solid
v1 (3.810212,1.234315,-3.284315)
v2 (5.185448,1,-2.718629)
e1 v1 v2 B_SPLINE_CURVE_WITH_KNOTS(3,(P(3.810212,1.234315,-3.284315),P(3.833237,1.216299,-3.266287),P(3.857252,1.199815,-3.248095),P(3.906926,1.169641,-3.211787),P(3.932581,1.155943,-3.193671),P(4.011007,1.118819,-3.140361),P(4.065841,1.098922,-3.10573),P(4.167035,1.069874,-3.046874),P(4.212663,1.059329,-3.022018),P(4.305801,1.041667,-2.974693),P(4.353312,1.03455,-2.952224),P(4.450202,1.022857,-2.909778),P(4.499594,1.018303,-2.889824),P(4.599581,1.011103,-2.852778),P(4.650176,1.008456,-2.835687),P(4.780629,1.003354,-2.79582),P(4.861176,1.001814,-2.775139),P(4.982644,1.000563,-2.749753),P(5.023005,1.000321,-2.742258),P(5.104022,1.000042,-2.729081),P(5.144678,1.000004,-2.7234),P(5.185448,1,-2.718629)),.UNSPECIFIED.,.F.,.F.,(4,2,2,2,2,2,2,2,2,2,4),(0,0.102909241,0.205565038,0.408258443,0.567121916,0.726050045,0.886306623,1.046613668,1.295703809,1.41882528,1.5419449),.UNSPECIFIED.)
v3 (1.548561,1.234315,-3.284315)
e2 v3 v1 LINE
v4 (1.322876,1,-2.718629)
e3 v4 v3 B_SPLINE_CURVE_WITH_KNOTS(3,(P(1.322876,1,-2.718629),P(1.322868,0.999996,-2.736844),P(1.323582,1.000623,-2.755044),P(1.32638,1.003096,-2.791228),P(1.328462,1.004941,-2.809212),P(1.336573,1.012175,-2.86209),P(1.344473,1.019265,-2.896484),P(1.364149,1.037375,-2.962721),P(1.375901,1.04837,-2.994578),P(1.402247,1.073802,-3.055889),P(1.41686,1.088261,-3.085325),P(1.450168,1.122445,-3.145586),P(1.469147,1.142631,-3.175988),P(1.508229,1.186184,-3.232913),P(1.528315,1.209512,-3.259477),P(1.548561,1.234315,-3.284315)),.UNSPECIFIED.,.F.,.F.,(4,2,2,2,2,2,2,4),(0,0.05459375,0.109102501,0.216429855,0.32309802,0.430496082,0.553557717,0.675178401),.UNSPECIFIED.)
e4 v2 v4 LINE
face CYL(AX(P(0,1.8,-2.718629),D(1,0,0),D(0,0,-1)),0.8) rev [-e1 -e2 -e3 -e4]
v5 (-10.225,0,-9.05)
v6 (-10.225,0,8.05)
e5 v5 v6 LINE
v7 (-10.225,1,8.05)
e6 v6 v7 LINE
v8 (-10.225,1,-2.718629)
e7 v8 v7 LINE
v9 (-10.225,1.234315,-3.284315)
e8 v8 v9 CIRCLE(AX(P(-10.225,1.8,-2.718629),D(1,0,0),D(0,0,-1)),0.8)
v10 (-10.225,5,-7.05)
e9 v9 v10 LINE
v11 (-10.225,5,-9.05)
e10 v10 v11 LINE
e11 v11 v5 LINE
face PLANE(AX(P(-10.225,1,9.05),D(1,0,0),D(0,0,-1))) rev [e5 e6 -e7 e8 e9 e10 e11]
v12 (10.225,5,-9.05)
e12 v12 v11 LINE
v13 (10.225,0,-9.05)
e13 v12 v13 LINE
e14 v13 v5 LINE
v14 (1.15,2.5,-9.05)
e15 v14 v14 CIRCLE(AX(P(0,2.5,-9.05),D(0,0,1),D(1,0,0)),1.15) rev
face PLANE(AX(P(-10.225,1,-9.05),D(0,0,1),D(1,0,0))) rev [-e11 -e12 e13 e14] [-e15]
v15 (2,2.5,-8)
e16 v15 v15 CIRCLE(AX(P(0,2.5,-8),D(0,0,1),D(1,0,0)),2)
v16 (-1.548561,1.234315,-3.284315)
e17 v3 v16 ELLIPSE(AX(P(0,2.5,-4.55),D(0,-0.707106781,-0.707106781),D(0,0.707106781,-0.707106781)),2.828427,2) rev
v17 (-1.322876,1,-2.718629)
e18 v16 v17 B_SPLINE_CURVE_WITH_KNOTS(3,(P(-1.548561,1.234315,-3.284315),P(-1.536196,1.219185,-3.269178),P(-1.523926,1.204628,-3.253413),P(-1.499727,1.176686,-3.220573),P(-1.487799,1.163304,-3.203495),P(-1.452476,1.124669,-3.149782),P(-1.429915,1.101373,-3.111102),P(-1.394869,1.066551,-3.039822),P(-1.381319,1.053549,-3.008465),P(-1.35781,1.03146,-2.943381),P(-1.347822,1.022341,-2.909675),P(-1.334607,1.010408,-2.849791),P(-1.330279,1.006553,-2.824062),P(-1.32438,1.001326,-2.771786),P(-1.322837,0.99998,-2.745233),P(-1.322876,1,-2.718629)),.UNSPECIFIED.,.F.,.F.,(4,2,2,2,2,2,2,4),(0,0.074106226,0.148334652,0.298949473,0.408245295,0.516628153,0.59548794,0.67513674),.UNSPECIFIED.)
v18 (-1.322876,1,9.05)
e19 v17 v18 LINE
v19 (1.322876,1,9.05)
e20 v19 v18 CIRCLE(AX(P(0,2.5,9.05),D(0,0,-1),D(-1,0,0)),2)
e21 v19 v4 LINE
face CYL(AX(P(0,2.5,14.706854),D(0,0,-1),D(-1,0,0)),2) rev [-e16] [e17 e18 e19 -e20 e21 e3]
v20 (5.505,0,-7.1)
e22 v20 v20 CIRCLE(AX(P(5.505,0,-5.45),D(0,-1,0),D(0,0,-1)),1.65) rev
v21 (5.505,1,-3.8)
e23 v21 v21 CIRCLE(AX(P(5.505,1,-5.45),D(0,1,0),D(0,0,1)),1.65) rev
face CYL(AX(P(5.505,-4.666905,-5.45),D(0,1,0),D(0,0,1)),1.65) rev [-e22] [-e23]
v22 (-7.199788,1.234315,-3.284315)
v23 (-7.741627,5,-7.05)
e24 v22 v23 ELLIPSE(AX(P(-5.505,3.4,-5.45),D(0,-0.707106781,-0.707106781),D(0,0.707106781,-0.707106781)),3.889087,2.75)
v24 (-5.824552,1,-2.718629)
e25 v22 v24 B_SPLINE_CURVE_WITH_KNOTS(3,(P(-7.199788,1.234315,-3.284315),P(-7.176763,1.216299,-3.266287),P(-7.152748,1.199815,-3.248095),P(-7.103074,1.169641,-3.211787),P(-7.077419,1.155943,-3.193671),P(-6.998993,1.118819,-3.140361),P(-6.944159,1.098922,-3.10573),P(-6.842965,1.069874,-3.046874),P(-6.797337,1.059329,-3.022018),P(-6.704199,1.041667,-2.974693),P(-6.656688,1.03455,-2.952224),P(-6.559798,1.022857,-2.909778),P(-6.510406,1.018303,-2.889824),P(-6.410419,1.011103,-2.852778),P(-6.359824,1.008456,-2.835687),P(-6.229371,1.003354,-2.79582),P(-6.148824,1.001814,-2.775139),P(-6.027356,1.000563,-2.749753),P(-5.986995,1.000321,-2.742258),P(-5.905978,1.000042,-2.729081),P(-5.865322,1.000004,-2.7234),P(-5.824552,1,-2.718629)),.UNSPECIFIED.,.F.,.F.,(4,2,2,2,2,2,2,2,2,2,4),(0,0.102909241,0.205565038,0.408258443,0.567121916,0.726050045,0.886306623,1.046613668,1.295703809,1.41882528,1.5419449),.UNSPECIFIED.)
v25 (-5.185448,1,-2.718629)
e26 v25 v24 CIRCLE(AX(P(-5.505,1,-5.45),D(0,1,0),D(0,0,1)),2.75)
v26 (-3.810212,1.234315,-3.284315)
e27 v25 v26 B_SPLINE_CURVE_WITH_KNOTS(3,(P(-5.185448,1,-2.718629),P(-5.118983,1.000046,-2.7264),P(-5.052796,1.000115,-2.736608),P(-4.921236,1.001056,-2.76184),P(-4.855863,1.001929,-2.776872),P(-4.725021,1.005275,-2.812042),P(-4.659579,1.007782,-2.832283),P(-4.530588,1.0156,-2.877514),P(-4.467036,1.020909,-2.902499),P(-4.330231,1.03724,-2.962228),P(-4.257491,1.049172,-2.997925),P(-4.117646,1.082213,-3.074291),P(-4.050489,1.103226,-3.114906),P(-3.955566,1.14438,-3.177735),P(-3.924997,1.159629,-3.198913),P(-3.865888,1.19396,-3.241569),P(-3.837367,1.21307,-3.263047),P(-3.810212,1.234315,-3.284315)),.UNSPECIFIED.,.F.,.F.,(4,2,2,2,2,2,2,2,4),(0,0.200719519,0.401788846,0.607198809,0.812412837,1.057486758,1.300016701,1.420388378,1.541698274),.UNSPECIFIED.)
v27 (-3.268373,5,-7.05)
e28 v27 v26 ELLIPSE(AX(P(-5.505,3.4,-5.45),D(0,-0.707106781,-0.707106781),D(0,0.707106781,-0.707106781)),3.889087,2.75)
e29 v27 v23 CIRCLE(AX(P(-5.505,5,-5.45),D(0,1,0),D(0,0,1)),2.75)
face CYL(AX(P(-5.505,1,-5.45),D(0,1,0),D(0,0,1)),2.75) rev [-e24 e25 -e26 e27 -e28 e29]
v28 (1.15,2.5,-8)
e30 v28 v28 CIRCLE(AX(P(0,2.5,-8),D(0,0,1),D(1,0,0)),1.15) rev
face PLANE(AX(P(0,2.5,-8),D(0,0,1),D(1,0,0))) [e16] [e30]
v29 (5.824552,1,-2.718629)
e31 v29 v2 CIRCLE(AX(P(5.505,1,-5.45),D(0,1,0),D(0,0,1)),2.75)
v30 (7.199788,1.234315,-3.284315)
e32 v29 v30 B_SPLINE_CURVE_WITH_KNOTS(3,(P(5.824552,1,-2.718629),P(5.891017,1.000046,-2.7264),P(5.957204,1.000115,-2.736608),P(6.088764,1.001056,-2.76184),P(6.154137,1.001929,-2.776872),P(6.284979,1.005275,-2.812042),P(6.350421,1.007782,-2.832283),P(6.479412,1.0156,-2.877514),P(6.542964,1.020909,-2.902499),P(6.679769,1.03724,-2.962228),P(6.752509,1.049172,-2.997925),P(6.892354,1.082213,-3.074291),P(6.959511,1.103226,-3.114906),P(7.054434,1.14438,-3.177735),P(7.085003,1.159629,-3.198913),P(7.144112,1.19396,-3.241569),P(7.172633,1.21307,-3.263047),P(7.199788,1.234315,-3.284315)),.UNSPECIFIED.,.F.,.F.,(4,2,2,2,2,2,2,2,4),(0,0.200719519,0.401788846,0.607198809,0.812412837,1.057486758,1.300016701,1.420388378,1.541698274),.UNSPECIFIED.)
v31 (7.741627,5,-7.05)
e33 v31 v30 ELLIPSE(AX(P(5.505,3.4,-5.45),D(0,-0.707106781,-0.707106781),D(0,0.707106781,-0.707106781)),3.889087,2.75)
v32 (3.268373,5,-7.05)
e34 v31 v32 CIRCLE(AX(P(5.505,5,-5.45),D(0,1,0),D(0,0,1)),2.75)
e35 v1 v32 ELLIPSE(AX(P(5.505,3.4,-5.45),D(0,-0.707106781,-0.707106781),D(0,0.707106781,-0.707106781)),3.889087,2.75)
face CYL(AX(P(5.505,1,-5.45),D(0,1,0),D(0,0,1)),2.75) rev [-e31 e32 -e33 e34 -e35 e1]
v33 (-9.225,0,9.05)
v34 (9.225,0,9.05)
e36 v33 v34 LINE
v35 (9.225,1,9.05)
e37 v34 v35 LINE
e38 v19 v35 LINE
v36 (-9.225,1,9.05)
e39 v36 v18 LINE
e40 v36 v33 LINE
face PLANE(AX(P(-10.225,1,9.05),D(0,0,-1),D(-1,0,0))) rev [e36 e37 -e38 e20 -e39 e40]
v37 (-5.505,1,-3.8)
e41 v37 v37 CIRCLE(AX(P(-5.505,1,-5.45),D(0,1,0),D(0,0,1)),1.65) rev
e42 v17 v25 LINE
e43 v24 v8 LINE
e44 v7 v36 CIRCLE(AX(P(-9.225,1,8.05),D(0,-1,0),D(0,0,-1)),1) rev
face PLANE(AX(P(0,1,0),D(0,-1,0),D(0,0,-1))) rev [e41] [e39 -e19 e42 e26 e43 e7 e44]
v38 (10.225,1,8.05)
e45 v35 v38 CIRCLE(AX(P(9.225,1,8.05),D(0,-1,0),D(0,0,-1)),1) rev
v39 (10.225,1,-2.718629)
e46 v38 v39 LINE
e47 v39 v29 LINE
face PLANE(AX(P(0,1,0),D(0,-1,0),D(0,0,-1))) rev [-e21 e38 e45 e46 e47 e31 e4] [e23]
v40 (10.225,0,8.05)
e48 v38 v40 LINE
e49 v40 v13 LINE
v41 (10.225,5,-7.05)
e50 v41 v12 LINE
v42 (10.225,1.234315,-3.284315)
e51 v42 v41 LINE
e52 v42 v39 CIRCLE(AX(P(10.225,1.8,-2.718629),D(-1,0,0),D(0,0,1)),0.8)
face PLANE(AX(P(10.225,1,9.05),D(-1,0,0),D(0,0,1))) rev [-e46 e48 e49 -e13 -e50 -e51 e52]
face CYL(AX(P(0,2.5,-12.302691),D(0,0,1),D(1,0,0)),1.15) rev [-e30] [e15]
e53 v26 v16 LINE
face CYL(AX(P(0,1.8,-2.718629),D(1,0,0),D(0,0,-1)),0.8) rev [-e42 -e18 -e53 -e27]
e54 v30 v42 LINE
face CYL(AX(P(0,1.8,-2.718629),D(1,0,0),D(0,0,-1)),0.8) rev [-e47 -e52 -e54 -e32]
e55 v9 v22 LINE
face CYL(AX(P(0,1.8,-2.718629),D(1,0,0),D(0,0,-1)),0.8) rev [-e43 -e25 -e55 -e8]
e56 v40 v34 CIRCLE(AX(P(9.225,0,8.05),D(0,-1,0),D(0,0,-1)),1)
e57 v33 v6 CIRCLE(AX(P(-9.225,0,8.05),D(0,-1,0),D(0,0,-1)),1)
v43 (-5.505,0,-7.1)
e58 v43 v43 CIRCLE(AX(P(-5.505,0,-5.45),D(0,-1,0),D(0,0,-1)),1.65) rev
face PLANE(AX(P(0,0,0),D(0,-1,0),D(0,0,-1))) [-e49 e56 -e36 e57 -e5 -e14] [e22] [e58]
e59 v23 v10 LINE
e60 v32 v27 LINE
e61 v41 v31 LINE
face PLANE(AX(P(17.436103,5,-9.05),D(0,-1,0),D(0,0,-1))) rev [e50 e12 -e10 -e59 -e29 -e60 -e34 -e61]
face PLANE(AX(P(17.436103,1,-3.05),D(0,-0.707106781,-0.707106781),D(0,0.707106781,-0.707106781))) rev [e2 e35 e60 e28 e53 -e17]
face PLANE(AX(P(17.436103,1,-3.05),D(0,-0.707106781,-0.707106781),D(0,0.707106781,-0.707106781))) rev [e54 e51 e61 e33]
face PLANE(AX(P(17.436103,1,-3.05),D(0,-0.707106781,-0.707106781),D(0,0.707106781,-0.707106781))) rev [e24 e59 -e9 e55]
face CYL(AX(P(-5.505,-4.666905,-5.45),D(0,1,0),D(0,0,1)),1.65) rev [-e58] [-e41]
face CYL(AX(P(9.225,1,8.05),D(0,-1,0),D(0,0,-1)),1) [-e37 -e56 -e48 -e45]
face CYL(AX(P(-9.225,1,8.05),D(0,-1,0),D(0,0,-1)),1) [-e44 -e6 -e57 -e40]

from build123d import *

# Parameters (mm, degrees)
SKETCH1_W                       = 20.45
SKETCH1_H                       = 18.1
BOSS_EXTRUDE2_DEPTH             = 1
BOSS_EXTRUDE3_REACH             = 15.691
BOSS_EXTRUDE3_DIRECTION_2_REACH = 15.691
SKETCH4_R                       = 1.65
CUT_EXTRUDE1_DEPTH              = 5
SKETCH6_R                       = 2.75
CUT_EXTRUDE2_DEPTH              = 4
SKETCH7_R                       = 1.15
CUT_EXTRUDE3_DEPTH              = 9.05
SKETCH8_R                       = 2
CUT_EXTRUDE4_DEPTH              = 8
CUT_EXTRUDE4_DIRECTION_2_REACH  = 16.541
FILLET2_R                       = 1
FILLET3_R                       = 0.8


with BuildPart() as part:
    # Sketch1 → Boss-Extrude2 (new body)
    with BuildSketch(Plane(origin=(0, 0, 0), x_dir=(1, 0, 0), z_dir=(0, 1, 0))):
        Rectangle(SKETCH1_W, SKETCH1_H)
    extrude(amount=BOSS_EXTRUDE2_DEPTH)

    # Boss-Extrude3: up to this face of the body (flat: up to its plane)
    boss_extrude3_end = Plane(part.part.faces().sort_by_distance((10.225, 0.5, 0))[0])
    # Sketch3 → Boss-Extrude3 (add, up to the picked face)
    with BuildSketch(Plane(origin=(0, 0, 0), x_dir=(0, 0, -1), z_dir=(1, 0, 0)), mode=Mode.PRIVATE) as boss_extrude3_sk1:
        Polygon((9.05, 1), (9.05, 5), (7.05, 5), (3.05, 1), align=None)
    boss_extrude3_tool1 = split(extrude(boss_extrude3_sk1.sketch, amount=BOSS_EXTRUDE3_REACH, mode=Mode.PRIVATE), bisect_by=boss_extrude3_end, keep=Keep.BOTH, mode=Mode.PRIVATE)
    add(boss_extrude3_tool1.solids().sort_by(Axis((0, 2.666667, -6.883333), (1, 0, 0)))[0])

    # Boss-Extrude3 direction 2: up to this face of the body (flat: up to its plane)
    boss_extrude3_direction_2_end = Plane(part.part.faces().sort_by_distance((-10.225, 0.5, 0))[0])
    # Sketch3 → Boss-Extrude3 direction 2 (add, up to the picked face)
    with BuildSketch(Plane(origin=(0, 0, 0), x_dir=(0, 0, -1), z_dir=(1, 0, 0)), mode=Mode.PRIVATE) as boss_extrude3_direction_2_sk1:
        Polygon((9.05, 1), (9.05, 5), (7.05, 5), (3.05, 1), align=None)
    boss_extrude3_direction_2_tool1 = split(extrude(boss_extrude3_direction_2_sk1.sketch, amount=-BOSS_EXTRUDE3_DIRECTION_2_REACH, mode=Mode.PRIVATE), bisect_by=boss_extrude3_direction_2_end, keep=Keep.BOTH, mode=Mode.PRIVATE)
    add(boss_extrude3_direction_2_tool1.solids().sort_by(Axis((0, 2.666667, -6.883333), (-1, 0, 0)))[0])

    # Sketch4 → Cut-Extrude1 (cut)
    with BuildSketch(Plane(origin=(0, 5, 0), x_dir=(1, 0, 0), z_dir=(0, 1, 0))):
        with Locations(Location((-5.505, 5.45, 0), (0, 0, 104.141110234))):
            Circle(SKETCH4_R)
        with Locations(Location((5.505, 5.45, 0), (0, 0, 75.858889766))):
            Circle(SKETCH4_R)
    extrude(amount=-CUT_EXTRUDE1_DEPTH, mode=Mode.SUBTRACT)

    # Sketch6 → Cut-Extrude2 (cut)
    with BuildSketch(Plane(origin=(0, 5, 0), x_dir=(1, 0, 0), z_dir=(0, 1, 0))):
        with Locations((-5.505, 5.45)):
            Circle(SKETCH6_R)
        with Locations((5.505, 5.45)):
            Circle(SKETCH6_R)
    extrude(amount=-CUT_EXTRUDE2_DEPTH, mode=Mode.SUBTRACT)

    # Sketch7 → Cut-Extrude3 (cut)
    with BuildSketch(Plane.XY):
        with Locations((0, 2.5)):
            Circle(SKETCH7_R)
    extrude(amount=-CUT_EXTRUDE3_DEPTH, mode=Mode.SUBTRACT)

    # Sketch8 → Cut-Extrude4 (cut)
    with BuildSketch(Plane.XY):
        with Locations(Location((0, 2.5, 0), (0, 0, 228.590377891))):
            Circle(SKETCH8_R)
    extrude(amount=-CUT_EXTRUDE4_DEPTH, mode=Mode.SUBTRACT)

    # Cut-Extrude4 direction 2: up to this face of the body (flat: up to its plane)
    cut_extrude4_direction_2_end = Plane(part.part.faces().sort_by_distance((0, 0.5, 9.05))[0])
    # Sketch8 → Cut-Extrude4 direction 2 (cut, up to the picked face)
    with BuildSketch(Plane.XY, mode=Mode.PRIVATE) as cut_extrude4_direction_2_sk1:
        with Locations(Location((0, 2.5, 0), (0, 0, 228.590377891))):
            Circle(SKETCH8_R)
    cut_extrude4_direction_2_tool1 = split(extrude(cut_extrude4_direction_2_sk1.sketch, amount=CUT_EXTRUDE4_DIRECTION_2_REACH, mode=Mode.PRIVATE), bisect_by=cut_extrude4_direction_2_end, keep=Keep.BOTH, mode=Mode.PRIVATE)
    add(cut_extrude4_direction_2_tool1.solids().sort_by(Axis((0, 2.5, 0), (0, 0, 1)))[0], mode=Mode.SUBTRACT)

    # Fillet2
    fillet2_edges = [part.edges().sort_by_distance(p)[0] for p in [
        (10.225, 0.5, 9.05),
        (-10.225, 0.5, 9.05),
    ]]
    fillet(fillet2_edges, radius=FILLET2_R)

    # Fillet3
    # the kernel refuses this fillet: 0.8 mm, written as the material it adds along each edge
    with BuildSketch(Plane(origin=(-6.019145033, 1, -3.05), x_dir=(0, 0, 1), z_dir=(-1, 0, 0))) as fillet3_piece_1_section:
        with BuildLine():
            CenterArc((FILLET3_R * 0.414213562373, FILLET3_R), FILLET3_R, 225, 45)
            Line((-FILLET3_R * 0.292893218813, FILLET3_R * 0.292893218813), (0, 0))
            Line((0, 0), (FILLET3_R * 0.414213562373, 0))
        make_face()
    fillet3_piece_1 = extrude(amount=4.205854967, mode=Mode.PRIVATE)
    fillet3_piece_1 = fillet3_piece_1 - Plane(origin=(-5.505, 1.04586757, -5.45), x_dir=(1, 0, 0), z_dir=(0, 1, 0)) * Cylinder(2.75, 10, mode=Mode.PRIVATE)
    add(fillet3_piece_1)
    with BuildSketch(Plane(origin=(-0.494448531, 1, -3.05), x_dir=(0, 0, 1), z_dir=(-1, 0, 0))) as fillet3_piece_2_section:
        with BuildLine():
            CenterArc((FILLET3_R * 0.414213562373, FILLET3_R), FILLET3_R, 225, 45)
            Line((-FILLET3_R * 0.292893218813, FILLET3_R * 0.292893218813), (0, 0))
            Line((0, 0), (FILLET3_R * 0.414213562373, 0))
        make_face()
    fillet3_piece_2 = extrude(amount=4.496406436, mode=Mode.PRIVATE)
    fillet3_piece_2 = fillet3_piece_2 - Plane(origin=(-5.505, 1.043873753, -5.45), x_dir=(1, 0, 0), z_dir=(0, 1, 0)) * Cylinder(2.75, 11, mode=Mode.PRIVATE)
    fillet3_piece_2 = fillet3_piece_2 - Plane(origin=(0, 2.5, -3.015215502), x_dir=(-0.6614378277626023, -0.7500000000031267, 0), z_dir=(0, 0, 1)) * Cylinder(2, 11, mode=Mode.PRIVATE)
    add(fillet3_piece_2)
    with BuildSketch(Plane(origin=(4.990854967, 1, -3.05), x_dir=(0, 0.7071067811865468, -0.7071067811865482), z_dir=(-1, 0, 0))) as fillet3_piece_3_section:
        with BuildLine():
            CenterArc((FILLET3_R * 0.414213562373, -FILLET3_R), FILLET3_R, 90, 45)
            Line((-FILLET3_R * 0.292893218813, -FILLET3_R * 0.292893218813), (0, 0))
            Line((0, 0), (FILLET3_R * 0.414213562373, 0))
        make_face()
    fillet3_piece_3 = extrude(amount=4.496406436, mode=Mode.PRIVATE)
    fillet3_piece_3 = fillet3_piece_3 - Plane(origin=(0, 2.5, -3.015215403), x_dir=(-0.6614378277626023, -0.7500000000031267, 0), z_dir=(0, 0, 1)) * Cylinder(2, 11, mode=Mode.PRIVATE)
    fillet3_piece_3 = fillet3_piece_3 - Plane(origin=(5.505, 1.043873896, -5.45), x_dir=(1, 0, 0), z_dir=(0, 1, 0)) * Cylinder(2.75, 11, mode=Mode.PRIVATE)
    add(fillet3_piece_3)
    with BuildSketch(Plane(origin=(10.225, 1, -3.05), x_dir=(0, 0, 1), z_dir=(-1, 0, 0))) as fillet3_piece_4_section:
        with BuildLine():
            CenterArc((FILLET3_R * 0.414213562373, FILLET3_R), FILLET3_R, 225, 45)
            Line((-FILLET3_R * 0.292893218813, FILLET3_R * 0.292893218813), (0, 0))
            Line((0, 0), (FILLET3_R * 0.414213562373, 0))
        make_face()
    fillet3_piece_4 = extrude(amount=4.205854967, mode=Mode.PRIVATE)
    fillet3_piece_4 = fillet3_piece_4 - Plane(origin=(5.505, 1.045867594, -5.45), x_dir=(1, 0, 0), z_dir=(0, 1, 0)) * Cylinder(2.75, 10, mode=Mode.PRIVATE)
    add(fillet3_piece_4)


solid = part.part
